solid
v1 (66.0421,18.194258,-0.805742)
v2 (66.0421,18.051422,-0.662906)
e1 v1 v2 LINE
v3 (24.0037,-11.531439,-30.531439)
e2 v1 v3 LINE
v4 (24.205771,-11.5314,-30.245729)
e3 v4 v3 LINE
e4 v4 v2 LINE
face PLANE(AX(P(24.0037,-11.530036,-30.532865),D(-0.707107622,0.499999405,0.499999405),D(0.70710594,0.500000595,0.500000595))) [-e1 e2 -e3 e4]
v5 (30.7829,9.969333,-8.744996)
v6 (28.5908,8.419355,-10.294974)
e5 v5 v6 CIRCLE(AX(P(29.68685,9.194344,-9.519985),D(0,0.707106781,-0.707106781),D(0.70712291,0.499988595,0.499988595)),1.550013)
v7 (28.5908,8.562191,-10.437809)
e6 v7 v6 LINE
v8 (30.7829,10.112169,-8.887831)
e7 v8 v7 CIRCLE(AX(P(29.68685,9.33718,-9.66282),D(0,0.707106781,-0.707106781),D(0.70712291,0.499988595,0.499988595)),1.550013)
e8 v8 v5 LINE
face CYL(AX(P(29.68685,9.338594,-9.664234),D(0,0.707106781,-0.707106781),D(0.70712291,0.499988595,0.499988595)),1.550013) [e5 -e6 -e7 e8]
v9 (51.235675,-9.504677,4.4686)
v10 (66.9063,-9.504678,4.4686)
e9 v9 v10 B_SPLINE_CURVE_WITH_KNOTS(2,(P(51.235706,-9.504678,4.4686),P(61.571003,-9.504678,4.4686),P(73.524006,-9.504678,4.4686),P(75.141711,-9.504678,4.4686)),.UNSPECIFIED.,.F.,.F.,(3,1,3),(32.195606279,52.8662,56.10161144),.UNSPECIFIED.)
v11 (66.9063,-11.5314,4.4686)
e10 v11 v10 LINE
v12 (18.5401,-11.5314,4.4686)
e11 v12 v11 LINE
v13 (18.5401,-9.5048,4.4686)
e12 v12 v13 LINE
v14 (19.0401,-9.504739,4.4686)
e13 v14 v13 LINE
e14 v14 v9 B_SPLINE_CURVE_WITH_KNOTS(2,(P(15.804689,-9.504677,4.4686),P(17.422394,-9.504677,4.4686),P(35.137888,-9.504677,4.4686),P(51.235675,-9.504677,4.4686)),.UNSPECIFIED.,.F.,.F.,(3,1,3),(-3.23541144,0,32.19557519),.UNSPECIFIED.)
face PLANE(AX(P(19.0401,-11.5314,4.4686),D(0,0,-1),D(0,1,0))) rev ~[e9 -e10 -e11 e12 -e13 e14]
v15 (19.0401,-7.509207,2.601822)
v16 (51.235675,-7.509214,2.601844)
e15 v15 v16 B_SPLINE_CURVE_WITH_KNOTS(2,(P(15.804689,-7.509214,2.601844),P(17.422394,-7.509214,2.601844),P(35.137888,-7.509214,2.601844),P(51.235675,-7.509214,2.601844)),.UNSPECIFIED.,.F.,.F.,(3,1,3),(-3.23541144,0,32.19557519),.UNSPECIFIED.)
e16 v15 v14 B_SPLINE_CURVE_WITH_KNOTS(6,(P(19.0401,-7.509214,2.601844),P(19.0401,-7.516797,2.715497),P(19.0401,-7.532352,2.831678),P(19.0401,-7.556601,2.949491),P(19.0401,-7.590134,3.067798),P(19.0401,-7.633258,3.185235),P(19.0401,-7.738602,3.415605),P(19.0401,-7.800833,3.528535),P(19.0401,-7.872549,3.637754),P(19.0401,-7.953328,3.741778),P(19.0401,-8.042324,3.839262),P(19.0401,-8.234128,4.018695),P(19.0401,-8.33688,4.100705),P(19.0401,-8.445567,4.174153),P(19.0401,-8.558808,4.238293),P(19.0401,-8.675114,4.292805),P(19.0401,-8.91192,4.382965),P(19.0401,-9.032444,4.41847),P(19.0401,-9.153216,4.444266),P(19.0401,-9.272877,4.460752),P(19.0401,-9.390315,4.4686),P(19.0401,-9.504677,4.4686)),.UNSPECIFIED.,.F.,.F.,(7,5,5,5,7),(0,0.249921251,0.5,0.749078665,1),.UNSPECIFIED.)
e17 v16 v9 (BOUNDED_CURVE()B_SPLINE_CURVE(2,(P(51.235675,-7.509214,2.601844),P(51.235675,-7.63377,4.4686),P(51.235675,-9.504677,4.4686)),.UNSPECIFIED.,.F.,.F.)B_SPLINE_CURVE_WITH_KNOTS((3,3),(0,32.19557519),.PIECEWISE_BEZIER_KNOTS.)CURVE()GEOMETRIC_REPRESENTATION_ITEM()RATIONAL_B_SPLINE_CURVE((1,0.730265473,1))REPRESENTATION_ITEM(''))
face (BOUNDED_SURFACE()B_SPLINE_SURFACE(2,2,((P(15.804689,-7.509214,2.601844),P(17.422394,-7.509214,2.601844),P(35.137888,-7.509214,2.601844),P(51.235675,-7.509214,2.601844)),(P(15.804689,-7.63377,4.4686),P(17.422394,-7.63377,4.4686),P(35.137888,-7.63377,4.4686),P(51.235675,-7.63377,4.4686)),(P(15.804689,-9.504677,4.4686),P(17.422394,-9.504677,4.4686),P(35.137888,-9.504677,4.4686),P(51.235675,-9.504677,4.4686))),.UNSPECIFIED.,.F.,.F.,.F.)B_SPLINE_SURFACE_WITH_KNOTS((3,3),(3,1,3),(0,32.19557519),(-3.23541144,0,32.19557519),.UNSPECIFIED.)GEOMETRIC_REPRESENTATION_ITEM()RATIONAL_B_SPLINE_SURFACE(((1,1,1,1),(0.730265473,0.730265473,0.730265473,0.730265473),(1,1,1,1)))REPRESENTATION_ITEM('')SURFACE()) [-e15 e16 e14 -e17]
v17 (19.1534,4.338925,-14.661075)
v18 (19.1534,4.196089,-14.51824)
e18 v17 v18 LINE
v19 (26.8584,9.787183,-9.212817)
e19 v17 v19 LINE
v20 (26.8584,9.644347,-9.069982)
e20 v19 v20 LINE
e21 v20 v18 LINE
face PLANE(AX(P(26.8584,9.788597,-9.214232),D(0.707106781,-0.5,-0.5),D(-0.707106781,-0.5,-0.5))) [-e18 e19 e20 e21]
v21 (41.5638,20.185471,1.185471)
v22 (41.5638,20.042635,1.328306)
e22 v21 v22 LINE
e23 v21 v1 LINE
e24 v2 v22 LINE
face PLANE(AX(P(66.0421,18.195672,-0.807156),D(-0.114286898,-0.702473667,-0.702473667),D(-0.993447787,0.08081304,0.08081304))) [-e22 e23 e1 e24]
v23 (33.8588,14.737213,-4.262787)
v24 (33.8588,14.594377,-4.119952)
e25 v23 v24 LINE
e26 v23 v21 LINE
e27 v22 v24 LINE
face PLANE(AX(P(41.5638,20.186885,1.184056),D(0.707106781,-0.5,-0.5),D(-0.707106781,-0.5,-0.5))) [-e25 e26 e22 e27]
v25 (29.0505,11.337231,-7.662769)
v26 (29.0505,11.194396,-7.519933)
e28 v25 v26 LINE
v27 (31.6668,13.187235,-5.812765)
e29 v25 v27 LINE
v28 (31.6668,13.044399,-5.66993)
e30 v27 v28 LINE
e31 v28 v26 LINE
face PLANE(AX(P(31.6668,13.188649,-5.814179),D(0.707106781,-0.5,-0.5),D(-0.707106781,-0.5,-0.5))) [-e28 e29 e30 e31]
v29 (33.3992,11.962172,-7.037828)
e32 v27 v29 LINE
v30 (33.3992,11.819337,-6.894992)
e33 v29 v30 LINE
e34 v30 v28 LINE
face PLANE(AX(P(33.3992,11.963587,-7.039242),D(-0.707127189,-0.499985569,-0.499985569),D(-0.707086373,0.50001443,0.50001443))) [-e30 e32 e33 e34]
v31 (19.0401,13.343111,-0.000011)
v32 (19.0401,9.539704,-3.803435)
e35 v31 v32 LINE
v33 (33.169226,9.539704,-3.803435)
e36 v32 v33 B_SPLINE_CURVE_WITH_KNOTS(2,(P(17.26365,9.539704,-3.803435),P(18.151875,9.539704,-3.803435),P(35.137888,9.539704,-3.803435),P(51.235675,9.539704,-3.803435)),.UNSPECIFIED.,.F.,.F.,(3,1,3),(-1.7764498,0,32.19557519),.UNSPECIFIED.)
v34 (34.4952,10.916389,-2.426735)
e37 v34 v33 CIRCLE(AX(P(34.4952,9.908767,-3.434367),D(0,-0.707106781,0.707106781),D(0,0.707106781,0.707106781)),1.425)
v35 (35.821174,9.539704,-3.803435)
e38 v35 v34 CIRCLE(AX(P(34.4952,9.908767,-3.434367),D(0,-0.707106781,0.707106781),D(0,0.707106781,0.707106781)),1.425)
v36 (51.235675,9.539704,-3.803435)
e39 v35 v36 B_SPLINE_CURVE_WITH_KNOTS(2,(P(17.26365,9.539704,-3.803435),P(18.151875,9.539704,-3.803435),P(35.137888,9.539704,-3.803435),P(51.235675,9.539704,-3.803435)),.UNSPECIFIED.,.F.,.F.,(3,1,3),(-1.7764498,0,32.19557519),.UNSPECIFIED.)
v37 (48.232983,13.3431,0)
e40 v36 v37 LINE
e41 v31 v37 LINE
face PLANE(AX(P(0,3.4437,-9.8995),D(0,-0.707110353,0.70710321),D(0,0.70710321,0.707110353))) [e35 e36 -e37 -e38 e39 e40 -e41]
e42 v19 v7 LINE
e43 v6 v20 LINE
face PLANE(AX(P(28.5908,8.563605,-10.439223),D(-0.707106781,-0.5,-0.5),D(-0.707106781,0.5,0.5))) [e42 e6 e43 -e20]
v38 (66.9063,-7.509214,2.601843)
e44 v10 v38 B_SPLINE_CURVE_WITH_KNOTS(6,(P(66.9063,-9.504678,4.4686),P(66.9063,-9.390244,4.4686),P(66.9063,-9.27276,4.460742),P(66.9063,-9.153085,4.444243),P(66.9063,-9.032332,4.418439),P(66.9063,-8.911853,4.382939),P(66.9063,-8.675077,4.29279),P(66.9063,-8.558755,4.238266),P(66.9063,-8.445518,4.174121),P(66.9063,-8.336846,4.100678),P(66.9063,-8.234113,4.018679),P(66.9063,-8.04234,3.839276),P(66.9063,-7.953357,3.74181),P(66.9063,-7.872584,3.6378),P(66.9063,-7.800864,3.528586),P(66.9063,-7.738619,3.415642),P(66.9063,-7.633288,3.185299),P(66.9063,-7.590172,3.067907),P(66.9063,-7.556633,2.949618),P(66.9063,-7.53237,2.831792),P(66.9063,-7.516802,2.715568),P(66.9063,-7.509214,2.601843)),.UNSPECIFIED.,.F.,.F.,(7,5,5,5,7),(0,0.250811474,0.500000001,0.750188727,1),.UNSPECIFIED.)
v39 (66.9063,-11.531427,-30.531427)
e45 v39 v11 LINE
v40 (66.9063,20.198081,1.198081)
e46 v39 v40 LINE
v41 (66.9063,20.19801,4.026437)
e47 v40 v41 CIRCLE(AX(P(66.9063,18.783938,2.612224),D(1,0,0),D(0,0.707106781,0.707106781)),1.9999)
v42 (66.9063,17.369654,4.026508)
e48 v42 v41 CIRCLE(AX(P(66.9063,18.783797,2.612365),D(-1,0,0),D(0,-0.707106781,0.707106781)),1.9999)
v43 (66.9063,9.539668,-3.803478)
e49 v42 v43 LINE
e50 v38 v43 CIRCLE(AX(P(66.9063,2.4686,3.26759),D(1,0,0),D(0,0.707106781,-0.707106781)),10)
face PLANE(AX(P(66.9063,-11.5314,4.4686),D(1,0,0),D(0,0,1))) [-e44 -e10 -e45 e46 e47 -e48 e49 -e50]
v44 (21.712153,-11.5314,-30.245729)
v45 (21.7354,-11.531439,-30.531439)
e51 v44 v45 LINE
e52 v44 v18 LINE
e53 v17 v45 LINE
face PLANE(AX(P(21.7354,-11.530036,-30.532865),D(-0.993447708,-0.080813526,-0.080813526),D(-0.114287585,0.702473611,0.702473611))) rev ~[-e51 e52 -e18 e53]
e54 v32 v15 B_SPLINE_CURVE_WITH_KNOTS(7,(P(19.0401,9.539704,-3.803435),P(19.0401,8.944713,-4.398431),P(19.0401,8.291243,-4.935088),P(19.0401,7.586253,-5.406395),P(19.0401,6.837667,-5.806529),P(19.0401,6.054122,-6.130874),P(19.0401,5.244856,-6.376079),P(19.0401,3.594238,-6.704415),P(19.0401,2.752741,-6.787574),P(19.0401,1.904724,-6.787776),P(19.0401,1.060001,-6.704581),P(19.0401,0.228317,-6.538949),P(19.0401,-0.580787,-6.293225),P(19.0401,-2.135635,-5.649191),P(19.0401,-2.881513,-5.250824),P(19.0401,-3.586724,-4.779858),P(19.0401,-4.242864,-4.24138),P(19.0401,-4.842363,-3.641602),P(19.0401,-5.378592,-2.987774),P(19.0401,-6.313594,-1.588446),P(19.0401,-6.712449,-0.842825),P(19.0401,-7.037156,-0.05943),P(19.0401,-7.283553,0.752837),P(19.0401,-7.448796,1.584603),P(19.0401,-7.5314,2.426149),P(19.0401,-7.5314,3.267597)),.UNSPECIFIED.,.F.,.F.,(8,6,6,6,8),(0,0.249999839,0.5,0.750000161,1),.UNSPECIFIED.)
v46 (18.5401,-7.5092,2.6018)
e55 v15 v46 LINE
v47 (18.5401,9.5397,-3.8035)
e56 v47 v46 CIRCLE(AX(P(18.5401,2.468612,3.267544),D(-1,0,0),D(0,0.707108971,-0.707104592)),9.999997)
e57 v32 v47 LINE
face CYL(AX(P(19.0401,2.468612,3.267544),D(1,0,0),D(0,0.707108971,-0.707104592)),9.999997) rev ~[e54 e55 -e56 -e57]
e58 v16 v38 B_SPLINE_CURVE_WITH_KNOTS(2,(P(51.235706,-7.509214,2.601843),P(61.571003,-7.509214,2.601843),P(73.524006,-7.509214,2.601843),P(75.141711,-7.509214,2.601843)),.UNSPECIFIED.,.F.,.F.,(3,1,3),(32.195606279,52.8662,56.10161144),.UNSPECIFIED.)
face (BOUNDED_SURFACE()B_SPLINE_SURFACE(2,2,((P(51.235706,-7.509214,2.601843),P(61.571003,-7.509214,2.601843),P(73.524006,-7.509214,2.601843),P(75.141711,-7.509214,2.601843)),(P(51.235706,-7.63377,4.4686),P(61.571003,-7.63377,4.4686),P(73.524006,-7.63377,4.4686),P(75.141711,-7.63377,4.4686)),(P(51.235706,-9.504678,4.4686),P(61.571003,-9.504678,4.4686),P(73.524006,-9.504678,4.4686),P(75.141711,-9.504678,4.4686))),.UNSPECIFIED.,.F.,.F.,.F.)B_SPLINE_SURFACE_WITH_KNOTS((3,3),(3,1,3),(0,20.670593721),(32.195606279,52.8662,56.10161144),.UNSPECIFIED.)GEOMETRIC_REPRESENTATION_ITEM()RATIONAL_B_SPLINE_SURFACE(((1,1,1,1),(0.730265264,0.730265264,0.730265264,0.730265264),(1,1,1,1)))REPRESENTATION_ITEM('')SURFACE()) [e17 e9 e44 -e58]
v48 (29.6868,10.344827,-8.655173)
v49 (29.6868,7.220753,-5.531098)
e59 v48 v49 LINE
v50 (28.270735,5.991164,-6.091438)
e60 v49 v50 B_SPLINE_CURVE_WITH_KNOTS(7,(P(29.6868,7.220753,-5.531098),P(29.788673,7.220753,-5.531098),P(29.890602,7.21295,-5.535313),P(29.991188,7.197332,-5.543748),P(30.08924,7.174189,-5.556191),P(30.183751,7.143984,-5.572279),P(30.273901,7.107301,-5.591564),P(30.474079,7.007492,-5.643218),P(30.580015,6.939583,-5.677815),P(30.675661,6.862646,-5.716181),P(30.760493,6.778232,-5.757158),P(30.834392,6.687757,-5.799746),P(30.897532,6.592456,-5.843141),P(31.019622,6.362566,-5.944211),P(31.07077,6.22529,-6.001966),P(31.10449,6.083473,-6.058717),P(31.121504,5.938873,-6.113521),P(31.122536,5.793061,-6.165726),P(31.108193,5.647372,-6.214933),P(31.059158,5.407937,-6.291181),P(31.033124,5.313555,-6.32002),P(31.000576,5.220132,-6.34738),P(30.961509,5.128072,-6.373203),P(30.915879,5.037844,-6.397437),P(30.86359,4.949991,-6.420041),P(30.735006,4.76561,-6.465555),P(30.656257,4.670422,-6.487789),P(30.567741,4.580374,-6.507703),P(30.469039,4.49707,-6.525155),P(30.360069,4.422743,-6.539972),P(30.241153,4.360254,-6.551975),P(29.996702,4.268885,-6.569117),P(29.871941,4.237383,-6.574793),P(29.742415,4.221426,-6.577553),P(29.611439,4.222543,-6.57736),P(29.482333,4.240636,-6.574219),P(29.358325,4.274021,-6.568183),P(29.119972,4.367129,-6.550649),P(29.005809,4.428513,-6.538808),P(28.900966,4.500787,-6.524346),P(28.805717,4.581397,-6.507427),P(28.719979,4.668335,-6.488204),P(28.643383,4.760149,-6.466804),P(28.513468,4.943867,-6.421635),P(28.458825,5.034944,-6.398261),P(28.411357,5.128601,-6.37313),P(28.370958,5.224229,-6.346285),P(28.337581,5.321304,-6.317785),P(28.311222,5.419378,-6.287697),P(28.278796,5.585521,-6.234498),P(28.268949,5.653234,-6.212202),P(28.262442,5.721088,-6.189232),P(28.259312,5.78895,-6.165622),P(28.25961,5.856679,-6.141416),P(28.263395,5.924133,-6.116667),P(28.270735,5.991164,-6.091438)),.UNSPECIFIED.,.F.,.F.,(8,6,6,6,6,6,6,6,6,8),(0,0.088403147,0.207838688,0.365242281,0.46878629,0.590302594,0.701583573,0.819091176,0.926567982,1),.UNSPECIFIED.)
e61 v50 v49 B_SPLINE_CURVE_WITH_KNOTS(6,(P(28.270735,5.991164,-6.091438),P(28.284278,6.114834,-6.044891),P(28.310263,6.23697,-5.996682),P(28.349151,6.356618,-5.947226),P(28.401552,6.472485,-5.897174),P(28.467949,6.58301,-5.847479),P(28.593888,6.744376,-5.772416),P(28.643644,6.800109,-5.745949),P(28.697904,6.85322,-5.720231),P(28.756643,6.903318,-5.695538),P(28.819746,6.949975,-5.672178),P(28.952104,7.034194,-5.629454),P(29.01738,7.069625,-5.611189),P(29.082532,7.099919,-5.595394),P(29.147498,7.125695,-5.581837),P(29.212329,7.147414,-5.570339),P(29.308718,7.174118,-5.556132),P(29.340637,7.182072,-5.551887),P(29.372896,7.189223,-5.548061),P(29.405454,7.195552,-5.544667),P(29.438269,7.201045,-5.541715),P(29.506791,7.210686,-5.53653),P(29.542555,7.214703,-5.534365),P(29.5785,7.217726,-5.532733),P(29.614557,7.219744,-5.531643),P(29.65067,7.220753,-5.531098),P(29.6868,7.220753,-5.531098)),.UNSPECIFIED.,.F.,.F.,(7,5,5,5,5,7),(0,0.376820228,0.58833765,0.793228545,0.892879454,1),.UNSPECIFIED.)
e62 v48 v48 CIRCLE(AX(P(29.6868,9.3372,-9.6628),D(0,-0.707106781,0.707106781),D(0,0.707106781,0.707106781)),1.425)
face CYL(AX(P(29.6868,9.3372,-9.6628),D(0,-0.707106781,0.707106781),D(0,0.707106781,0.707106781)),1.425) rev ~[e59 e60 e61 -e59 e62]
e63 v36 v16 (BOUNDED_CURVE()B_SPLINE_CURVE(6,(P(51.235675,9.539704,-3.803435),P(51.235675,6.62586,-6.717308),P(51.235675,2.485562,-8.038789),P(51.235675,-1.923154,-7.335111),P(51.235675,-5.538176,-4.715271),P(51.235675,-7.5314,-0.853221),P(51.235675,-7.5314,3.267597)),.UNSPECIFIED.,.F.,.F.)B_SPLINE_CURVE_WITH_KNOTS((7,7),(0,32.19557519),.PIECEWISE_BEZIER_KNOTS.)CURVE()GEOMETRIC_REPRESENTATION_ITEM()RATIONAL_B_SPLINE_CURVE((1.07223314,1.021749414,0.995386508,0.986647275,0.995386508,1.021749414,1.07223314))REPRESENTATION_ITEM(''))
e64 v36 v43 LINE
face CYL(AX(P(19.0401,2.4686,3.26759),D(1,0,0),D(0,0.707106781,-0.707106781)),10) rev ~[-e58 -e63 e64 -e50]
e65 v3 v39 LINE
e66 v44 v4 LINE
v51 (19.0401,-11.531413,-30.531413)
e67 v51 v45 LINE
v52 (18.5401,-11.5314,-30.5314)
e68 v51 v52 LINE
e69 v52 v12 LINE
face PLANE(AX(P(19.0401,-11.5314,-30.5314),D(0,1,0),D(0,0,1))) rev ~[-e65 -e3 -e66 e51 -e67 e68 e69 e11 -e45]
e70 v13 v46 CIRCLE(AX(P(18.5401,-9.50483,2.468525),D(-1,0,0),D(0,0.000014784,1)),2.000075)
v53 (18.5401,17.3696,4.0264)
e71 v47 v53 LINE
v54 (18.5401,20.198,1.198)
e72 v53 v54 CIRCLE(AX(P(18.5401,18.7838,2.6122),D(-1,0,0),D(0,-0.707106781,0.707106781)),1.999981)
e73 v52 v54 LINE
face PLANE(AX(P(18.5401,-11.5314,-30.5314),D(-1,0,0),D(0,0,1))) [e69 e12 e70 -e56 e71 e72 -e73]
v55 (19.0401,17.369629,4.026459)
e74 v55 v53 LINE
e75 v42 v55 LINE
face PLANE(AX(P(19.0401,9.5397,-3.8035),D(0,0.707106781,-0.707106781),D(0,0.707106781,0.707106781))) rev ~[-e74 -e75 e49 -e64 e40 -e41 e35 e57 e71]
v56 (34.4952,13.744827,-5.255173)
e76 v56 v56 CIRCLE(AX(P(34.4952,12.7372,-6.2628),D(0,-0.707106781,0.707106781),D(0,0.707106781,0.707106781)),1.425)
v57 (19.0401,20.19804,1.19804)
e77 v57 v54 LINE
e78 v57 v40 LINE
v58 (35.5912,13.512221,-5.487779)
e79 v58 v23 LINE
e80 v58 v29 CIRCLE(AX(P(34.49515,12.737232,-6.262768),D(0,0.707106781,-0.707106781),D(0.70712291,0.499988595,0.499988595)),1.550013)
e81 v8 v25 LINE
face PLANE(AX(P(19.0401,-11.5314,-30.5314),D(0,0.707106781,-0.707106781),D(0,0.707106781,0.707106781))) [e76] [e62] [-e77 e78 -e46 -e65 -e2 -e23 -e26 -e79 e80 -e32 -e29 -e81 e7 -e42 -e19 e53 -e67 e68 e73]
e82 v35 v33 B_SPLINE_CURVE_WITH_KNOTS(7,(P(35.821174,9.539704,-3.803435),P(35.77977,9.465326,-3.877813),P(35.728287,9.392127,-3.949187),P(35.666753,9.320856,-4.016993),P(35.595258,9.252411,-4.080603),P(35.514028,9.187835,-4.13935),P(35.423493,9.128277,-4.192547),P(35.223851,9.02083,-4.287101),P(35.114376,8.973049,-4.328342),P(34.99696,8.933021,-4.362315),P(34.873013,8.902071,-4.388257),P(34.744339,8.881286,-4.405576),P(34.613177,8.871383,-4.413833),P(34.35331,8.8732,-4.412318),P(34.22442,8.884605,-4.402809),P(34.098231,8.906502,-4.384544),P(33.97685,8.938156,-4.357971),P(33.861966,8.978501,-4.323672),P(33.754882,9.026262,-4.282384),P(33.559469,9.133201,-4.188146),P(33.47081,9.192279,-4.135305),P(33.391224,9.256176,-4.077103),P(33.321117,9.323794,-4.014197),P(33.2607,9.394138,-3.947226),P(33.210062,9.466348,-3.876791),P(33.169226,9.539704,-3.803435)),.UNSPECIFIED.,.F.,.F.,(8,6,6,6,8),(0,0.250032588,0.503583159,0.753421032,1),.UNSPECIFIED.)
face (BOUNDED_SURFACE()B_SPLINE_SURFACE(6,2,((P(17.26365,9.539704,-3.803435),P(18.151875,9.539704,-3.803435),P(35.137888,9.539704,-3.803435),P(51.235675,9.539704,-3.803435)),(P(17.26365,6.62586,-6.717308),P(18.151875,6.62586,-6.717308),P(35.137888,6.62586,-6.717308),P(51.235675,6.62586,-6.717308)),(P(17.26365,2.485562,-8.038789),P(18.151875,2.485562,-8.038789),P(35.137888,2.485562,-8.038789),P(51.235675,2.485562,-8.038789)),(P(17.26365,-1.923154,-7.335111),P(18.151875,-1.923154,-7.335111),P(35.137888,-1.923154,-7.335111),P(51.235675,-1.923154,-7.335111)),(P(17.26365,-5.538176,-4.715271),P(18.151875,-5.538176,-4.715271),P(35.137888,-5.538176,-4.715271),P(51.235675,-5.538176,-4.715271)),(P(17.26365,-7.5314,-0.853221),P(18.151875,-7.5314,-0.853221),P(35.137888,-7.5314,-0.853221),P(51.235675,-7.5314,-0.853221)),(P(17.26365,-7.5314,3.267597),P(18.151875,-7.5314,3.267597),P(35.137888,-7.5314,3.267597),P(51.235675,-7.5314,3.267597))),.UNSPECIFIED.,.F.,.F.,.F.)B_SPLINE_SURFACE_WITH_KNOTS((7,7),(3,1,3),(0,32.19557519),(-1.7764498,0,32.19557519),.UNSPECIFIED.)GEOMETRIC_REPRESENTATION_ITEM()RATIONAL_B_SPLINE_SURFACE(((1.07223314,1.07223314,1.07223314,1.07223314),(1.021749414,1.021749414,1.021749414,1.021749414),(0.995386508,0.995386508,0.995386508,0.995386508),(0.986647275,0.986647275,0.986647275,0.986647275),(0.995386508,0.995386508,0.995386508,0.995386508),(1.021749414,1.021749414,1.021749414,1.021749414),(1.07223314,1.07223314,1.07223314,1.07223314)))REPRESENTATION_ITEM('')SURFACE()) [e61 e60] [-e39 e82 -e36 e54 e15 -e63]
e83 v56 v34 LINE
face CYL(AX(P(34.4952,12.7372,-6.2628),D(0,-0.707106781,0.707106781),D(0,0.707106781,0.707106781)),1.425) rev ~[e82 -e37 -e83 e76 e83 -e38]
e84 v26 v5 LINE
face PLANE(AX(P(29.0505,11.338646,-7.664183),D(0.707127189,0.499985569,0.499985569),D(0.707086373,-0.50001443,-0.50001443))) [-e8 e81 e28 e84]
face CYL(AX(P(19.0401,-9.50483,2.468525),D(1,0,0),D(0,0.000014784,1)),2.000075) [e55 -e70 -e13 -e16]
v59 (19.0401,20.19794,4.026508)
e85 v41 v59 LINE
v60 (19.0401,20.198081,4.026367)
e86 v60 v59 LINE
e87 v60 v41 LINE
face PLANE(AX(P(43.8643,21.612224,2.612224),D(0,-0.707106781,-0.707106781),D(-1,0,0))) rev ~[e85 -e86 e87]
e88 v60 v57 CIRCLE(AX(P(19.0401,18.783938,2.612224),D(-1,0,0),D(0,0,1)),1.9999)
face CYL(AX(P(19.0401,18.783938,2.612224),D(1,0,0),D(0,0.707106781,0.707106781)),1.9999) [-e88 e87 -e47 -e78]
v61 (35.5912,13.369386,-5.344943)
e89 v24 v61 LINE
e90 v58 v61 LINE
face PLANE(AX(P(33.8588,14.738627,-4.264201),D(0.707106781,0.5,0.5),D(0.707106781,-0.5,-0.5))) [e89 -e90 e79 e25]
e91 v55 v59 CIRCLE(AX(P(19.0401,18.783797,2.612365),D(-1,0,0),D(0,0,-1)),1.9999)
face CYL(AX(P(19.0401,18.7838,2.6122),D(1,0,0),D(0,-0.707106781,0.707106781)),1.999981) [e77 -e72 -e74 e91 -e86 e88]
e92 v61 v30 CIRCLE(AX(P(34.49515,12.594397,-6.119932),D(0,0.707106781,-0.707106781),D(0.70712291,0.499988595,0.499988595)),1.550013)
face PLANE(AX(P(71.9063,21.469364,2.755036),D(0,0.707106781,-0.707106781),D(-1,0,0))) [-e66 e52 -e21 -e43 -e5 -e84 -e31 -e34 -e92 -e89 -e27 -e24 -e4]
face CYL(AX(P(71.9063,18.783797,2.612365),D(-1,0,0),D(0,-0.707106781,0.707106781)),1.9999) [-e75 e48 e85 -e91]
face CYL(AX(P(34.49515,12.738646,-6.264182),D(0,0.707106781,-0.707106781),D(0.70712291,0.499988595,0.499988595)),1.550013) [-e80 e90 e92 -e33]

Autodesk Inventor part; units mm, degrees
sketch "Sketch1" plane through (0, 0, 0) normal (1, 0, 0) x (0, 1, 0)
  line L0 (0, 0) -> (0, -19)
  line L1 (0, -19) -> (19, 0)
  line L2 (0, -19) -> (9.9437, -19) construction
  line L3 (0, -19) -> (19, 0)
  line L4 (19, 0) -> (0, 0)
  dimension "d0" = 19
  dimension "d1" = 45
extrude "Extrusion1" add sketch "Sketch1" along normal blind 61
sketch "Sketch2" plane through (61, 19, 0) normal (0, 0.7071068, -0.7071068) x (-1, 0, 0)
  line L0 (47, 0) -> (15, 0)
  line L1 (61, -26.8701) -> (0, -26.8701) projected
  line L2 (61, -26.8701) -> (0, -26.8701)
  line L3 (61, 0) -> (0, 0) projected
  line L4 (47, 0) -> (61, 0)
  line L5 (61, -26.8701) -> (61, 0) projected
  line L6 (61, 0) -> (61, -26.8701)
  line L7 (0, -26.8701) -> (0, 0) projected
  line L8 (0, 0) -> (0, -26.8701)
  line L9 (15, 0) -> (0, -26.8701)
  line L10 (47, 0) -> (61, -26.8701)
  point P0 (31, 0)
  point P1 (31, 0)
  dimension "d4" = 32
sketch "Sketch3" plane through (0, 0, 0) normal (-1, 0, 0) x (0, 0, 1)
  line L0 (-19, 0) -> (0, 19) projected
  line L1 (0, 19) -> (-12.7279, 6.2721)
  line L2 (-12.7279, 6.2721) -> (-9.8995, 3.4437)
  line L3 (-9.8995, 3.4437) -> (0, 13.3431)
  line L4 (0, 19) -> (0, 0) projected
  line L5 (-9.8995, 3.4437) -> (0, 3.4437)
  dimension "d5" = 18
  dimension "d6" = 4
extrude "Extrusion2" cut sketch "Sketch3" against normal blind 62 contours L3 L4 L5
sketch "Sketch4" plane through (61, 0, -19) normal (0, 0.7071068, -0.7071068) x (-1, 0, 0)
  line L0 (61, 26.8701) -> (0, 26.8701) construction
  line L1 (30.5, 26.8701) -> (30.5, 0) construction
  line L2 (61, 0) -> (0, 0) construction
  line L3 (30.5, 17.2) -> (30.5, -1.6) construction
  line L4 (52.0668, -4.3668) -> (8.9332, 38.7668) construction
  line L5 (41.9599, 0) -> (41.9599, -16.3079)
  line L6 (41.9599, -16.3079) -> (-10.9063, -16.3079)
  line L7 (-10.9063, -16.3079) -> (-10.9063, 26.8701)
  line L8 (17.1357, 30.5643) -> (-10.9063, 30.5643)
  line L9 (-10.9063, 30.5643) -> (-10.9063, 26.8701)
  line L10 (17.1357, 30.5643) -> (41.9599, 30.5643)
  line L11 (41.9599, 0) -> (41.9599, 30.5643)
  line L12 (36.9964, -16.3079) -> (-5.0421, 25.7306)
  line L13 (-5.0421, 25.7306) -> (19.4362, 28.5467)
  line L14 (19.4362, 28.5467) -> (27.1412, 20.8416)
  line L15 (27.1412, 20.8416) -> (25.4088, 19.1092)
  arc A0 (25.4088, 19.1092) -> (27.6009, 16.9172) centre (26.5048, 18.0132) ccw
  line L16 (27.6009, 16.9172) -> (29.3333, 18.6496)
  line L17 (39.262, -16.3307) -> (41.8467, 6.1362)
  line L18 (29.3333, 18.6496) -> (31.9496, 16.0333)
  line L19 (31.9496, 16.0333) -> (30.2172, 14.3009)
  arc A1 (30.2172, 14.3009) -> (32.4092, 12.1088) centre (31.3132, 13.2048) ccw
  line L20 (32.4092, 12.1088) -> (34.1416, 13.8412)
  line L21 (34.1416, 13.8412) -> (41.8467, 6.1362)
  line L22 (29.1919, 18.5081) -> (29.3333, 18.6496)
  line L23 (29.3333, 18.6496) -> (29.4747, 18.5081)
  point P0 (61, 13.435)
  point P1 (47, 26.8701)
  point P2 (15, 26.8701)
  dimension "d13" = 18.8
  dimension "d14" = 1.6
extrude "Extrusion4" cut sketch "Sketch2" against normal blind 62 contours L3 L5 L10 | L9 L7 L3
sketch "Sketch5" plane through (61, 0, -19) normal (0, 0.7071068, -0.7071068) x (-1, 0, 0)
  point P0 (61, 13.435)
extrude "Extrusion5" add sketch "Sketch4" against normal up to surface (4 mm away)
sketch "Sketch6" plane through (19.0401, 0, -19) normal (-1, 0, 0) x (0, 0, 1)
  line L0 (-11.5314, -11.5314) -> (-5.8745, -11.5314)
  line L1 (5.6569, 0) -> (-5.8745, -11.5314)
  line L2 (-11.5314, -11.5314) -> (0, 0)
  line L3 (21.6122, 21.6122) -> (-11.5314, -11.5314) projected
  line L4 (19, 0) -> (0, 0) projected
  line L5 (5.6569, 0) -> (0, 0)
  line L6 (-11.5314, -11.5314) -> (-8.703, -14.3598) projected
  line L7 (-11.5314, -11.5314) -> (-8.703, -14.3598)
  line L8 (-8.703, -14.3598) -> (-5.8745, -11.5314)
extrude "Extrusion6" cut sketch "Sketch6" against normal blind 62 contours L0 L8 L6
ref_plane "Work Plane2" through (19.0401, 0, -19) normal (-1, 0, 0) x (0, 0, 1)
split "Split1" plane through (19.0401, 0, -19) removes the side toward (-1, 0, 0)
ref_plane "Work Plane3" through (19.0401, 18.7838, 5.4407) normal (0, -0.7071068, 0.7071068) x (1, 0, 0)
split "Split2" plane through (19.0401, 18.7838, 5.4407) removes the side toward (0, -0.7071068, 0.7071068)
sketch "Sketch7" plane through (19.0401, -11.5314, -30.5314) normal (-1, 0, 0) x (0, 0, 1)
  line L0 (5.6569, 0) -> (0, 0) projected
  line L1 (0, 0) -> (35, 0)
  line L2 (35, 0) -> (35, 4)
  line L3 (35, 4) -> (4, 4)
  line L4 (0, 0) -> (33.1436, 33.1436) projected
  line L5 (4, 4) -> (0, 0)
  point P0 (30.5314, 11.5314)
  dimension "d29" = 35
  dimension "d30" = 4
extrude "Extrusion7" add sketch "Sketch7" against normal up to surface (52.8662 mm away)
sketch "Sketch8" plane through (71.9063, 21.6122, 2.6122) normal (0, 0.7071068, -0.7071068) x (-1, 0, 0)
  line L0 (30.3425, -2.0177) -> (38.0475, -9.7227)
  line L1 (62.973, -34.9311) -> (19.8395, 8.2024) construction
  line L2 (38.0475, -9.7227) -> (36.3151, -11.4551)
  arc A0 (36.3151, -11.4551) -> (38.5071, -13.6472) centre (37.4111, -12.5511) ccw
  line L3 (38.5071, -13.6472) -> (40.2395, -11.9147)
  line L4 (40.2395, -11.9147) -> (42.8558, -14.531)
  line L5 (42.8558, -14.531) -> (41.1234, -16.2635)
  arc A1 (41.1234, -16.2635) -> (43.3155, -18.4555) centre (42.2194, -17.3595) ccw
  line L6 (43.3155, -18.4555) -> (45.0479, -16.7231)
  line L7 (45.0479, -16.7231) -> (52.7529, -24.4281)
  line L8 (50.1709, -46.8722) -> (52.7529, -24.4281)
  line L9 (47.9026, -46.8722) -> (5.8642, -4.8337)
  line L10 (5.8642, -4.8337) -> (30.3425, -2.0177)
  line L11 (52.8662, -46.8722) -> (0, -46.8722)
  point P0 (71.9063, -17.1293)
extrude "Extrusion8" cut sketch "Sketch8" against normal blind 0.2
fillet "Fillet1" radius 10 1 edges at (45.4732, -7.5314, -20.8745)
fillet "Fillet1" radius 2 3 edges at (45.4732, -7.5314, 4.4686) (45.4732, 18.7838, 5.4407) (45.4732, 21.6122, 2.6122)
sketch "Sketch9" plane through (71.9063, -11.5314, -30.5314) normal (0, 0.7071068, -0.7071068) x (-1, 0, 0)
  arc A0 (36.3151, 35.417) -> (38.5071, 33.225) centre (37.4111, 34.321) ccw projected
  point P0 (71.9063, 29.7429)
hole "Hole1" at (34.4952, 12.7372, -6.2628) direction (0, -0.7071068, 0.7071068) diameter 2.85 end through all
sketch "Sketch10" plane through (71.9063, -11.5314, -30.5314) normal (0, 0.7071068, -0.7071068) x (-1, 0, 0)
  arc A0 (41.1234, 30.6087) -> (43.3155, 28.4167) centre (42.2194, 29.5127) ccw projected
  point P0 (71.9063, 29.7429)
hole "Hole2" at (29.6868, 9.3372, -9.6628) direction (0, -0.7071068, 0.7071068) diameter 2.85 end through all
ref_plane "Work Plane4" through (66.9063, -11.5314, 4.4686) normal (1, 0, 0) x (0, 0, -1)
split "Split3" plane through (66.9063, -11.5314, 4.4686) removes the side toward (1, 0, 0)
sketch "Sketch11" plane through (19.0401, -11.5314, -30.5314) normal (-1, 0, 0) x (0, 0, 1)
  arc A0 (34.5578, 28.901) -> (31.7294, 31.7294) centre (33.1436, 30.3152) ccw projected
  line L0 (0, 0) -> (31.7294, 31.7294) projected
  line L1 (0, 0) -> (35, 0) projected
  line L2 (35, 0) -> (35, 2.0266) projected
  arc A1 (35, 2.0266) -> (33.1332, 4.0222) centre (33, 2.0266) ccw projected
  arc A2 (26.7279, 21.0711) -> (33.1332, 4.0222) centre (33.799, 14) ccw projected
  line L3 (26.7279, 21.0711) -> (34.5578, 28.901) projected
  point P0 (30.5314, 11.5314)
extrude "Extrusion9" add sketch "Sketch11" along normal blind 0.5
properties part number "cutter" material "PET Plastic"
